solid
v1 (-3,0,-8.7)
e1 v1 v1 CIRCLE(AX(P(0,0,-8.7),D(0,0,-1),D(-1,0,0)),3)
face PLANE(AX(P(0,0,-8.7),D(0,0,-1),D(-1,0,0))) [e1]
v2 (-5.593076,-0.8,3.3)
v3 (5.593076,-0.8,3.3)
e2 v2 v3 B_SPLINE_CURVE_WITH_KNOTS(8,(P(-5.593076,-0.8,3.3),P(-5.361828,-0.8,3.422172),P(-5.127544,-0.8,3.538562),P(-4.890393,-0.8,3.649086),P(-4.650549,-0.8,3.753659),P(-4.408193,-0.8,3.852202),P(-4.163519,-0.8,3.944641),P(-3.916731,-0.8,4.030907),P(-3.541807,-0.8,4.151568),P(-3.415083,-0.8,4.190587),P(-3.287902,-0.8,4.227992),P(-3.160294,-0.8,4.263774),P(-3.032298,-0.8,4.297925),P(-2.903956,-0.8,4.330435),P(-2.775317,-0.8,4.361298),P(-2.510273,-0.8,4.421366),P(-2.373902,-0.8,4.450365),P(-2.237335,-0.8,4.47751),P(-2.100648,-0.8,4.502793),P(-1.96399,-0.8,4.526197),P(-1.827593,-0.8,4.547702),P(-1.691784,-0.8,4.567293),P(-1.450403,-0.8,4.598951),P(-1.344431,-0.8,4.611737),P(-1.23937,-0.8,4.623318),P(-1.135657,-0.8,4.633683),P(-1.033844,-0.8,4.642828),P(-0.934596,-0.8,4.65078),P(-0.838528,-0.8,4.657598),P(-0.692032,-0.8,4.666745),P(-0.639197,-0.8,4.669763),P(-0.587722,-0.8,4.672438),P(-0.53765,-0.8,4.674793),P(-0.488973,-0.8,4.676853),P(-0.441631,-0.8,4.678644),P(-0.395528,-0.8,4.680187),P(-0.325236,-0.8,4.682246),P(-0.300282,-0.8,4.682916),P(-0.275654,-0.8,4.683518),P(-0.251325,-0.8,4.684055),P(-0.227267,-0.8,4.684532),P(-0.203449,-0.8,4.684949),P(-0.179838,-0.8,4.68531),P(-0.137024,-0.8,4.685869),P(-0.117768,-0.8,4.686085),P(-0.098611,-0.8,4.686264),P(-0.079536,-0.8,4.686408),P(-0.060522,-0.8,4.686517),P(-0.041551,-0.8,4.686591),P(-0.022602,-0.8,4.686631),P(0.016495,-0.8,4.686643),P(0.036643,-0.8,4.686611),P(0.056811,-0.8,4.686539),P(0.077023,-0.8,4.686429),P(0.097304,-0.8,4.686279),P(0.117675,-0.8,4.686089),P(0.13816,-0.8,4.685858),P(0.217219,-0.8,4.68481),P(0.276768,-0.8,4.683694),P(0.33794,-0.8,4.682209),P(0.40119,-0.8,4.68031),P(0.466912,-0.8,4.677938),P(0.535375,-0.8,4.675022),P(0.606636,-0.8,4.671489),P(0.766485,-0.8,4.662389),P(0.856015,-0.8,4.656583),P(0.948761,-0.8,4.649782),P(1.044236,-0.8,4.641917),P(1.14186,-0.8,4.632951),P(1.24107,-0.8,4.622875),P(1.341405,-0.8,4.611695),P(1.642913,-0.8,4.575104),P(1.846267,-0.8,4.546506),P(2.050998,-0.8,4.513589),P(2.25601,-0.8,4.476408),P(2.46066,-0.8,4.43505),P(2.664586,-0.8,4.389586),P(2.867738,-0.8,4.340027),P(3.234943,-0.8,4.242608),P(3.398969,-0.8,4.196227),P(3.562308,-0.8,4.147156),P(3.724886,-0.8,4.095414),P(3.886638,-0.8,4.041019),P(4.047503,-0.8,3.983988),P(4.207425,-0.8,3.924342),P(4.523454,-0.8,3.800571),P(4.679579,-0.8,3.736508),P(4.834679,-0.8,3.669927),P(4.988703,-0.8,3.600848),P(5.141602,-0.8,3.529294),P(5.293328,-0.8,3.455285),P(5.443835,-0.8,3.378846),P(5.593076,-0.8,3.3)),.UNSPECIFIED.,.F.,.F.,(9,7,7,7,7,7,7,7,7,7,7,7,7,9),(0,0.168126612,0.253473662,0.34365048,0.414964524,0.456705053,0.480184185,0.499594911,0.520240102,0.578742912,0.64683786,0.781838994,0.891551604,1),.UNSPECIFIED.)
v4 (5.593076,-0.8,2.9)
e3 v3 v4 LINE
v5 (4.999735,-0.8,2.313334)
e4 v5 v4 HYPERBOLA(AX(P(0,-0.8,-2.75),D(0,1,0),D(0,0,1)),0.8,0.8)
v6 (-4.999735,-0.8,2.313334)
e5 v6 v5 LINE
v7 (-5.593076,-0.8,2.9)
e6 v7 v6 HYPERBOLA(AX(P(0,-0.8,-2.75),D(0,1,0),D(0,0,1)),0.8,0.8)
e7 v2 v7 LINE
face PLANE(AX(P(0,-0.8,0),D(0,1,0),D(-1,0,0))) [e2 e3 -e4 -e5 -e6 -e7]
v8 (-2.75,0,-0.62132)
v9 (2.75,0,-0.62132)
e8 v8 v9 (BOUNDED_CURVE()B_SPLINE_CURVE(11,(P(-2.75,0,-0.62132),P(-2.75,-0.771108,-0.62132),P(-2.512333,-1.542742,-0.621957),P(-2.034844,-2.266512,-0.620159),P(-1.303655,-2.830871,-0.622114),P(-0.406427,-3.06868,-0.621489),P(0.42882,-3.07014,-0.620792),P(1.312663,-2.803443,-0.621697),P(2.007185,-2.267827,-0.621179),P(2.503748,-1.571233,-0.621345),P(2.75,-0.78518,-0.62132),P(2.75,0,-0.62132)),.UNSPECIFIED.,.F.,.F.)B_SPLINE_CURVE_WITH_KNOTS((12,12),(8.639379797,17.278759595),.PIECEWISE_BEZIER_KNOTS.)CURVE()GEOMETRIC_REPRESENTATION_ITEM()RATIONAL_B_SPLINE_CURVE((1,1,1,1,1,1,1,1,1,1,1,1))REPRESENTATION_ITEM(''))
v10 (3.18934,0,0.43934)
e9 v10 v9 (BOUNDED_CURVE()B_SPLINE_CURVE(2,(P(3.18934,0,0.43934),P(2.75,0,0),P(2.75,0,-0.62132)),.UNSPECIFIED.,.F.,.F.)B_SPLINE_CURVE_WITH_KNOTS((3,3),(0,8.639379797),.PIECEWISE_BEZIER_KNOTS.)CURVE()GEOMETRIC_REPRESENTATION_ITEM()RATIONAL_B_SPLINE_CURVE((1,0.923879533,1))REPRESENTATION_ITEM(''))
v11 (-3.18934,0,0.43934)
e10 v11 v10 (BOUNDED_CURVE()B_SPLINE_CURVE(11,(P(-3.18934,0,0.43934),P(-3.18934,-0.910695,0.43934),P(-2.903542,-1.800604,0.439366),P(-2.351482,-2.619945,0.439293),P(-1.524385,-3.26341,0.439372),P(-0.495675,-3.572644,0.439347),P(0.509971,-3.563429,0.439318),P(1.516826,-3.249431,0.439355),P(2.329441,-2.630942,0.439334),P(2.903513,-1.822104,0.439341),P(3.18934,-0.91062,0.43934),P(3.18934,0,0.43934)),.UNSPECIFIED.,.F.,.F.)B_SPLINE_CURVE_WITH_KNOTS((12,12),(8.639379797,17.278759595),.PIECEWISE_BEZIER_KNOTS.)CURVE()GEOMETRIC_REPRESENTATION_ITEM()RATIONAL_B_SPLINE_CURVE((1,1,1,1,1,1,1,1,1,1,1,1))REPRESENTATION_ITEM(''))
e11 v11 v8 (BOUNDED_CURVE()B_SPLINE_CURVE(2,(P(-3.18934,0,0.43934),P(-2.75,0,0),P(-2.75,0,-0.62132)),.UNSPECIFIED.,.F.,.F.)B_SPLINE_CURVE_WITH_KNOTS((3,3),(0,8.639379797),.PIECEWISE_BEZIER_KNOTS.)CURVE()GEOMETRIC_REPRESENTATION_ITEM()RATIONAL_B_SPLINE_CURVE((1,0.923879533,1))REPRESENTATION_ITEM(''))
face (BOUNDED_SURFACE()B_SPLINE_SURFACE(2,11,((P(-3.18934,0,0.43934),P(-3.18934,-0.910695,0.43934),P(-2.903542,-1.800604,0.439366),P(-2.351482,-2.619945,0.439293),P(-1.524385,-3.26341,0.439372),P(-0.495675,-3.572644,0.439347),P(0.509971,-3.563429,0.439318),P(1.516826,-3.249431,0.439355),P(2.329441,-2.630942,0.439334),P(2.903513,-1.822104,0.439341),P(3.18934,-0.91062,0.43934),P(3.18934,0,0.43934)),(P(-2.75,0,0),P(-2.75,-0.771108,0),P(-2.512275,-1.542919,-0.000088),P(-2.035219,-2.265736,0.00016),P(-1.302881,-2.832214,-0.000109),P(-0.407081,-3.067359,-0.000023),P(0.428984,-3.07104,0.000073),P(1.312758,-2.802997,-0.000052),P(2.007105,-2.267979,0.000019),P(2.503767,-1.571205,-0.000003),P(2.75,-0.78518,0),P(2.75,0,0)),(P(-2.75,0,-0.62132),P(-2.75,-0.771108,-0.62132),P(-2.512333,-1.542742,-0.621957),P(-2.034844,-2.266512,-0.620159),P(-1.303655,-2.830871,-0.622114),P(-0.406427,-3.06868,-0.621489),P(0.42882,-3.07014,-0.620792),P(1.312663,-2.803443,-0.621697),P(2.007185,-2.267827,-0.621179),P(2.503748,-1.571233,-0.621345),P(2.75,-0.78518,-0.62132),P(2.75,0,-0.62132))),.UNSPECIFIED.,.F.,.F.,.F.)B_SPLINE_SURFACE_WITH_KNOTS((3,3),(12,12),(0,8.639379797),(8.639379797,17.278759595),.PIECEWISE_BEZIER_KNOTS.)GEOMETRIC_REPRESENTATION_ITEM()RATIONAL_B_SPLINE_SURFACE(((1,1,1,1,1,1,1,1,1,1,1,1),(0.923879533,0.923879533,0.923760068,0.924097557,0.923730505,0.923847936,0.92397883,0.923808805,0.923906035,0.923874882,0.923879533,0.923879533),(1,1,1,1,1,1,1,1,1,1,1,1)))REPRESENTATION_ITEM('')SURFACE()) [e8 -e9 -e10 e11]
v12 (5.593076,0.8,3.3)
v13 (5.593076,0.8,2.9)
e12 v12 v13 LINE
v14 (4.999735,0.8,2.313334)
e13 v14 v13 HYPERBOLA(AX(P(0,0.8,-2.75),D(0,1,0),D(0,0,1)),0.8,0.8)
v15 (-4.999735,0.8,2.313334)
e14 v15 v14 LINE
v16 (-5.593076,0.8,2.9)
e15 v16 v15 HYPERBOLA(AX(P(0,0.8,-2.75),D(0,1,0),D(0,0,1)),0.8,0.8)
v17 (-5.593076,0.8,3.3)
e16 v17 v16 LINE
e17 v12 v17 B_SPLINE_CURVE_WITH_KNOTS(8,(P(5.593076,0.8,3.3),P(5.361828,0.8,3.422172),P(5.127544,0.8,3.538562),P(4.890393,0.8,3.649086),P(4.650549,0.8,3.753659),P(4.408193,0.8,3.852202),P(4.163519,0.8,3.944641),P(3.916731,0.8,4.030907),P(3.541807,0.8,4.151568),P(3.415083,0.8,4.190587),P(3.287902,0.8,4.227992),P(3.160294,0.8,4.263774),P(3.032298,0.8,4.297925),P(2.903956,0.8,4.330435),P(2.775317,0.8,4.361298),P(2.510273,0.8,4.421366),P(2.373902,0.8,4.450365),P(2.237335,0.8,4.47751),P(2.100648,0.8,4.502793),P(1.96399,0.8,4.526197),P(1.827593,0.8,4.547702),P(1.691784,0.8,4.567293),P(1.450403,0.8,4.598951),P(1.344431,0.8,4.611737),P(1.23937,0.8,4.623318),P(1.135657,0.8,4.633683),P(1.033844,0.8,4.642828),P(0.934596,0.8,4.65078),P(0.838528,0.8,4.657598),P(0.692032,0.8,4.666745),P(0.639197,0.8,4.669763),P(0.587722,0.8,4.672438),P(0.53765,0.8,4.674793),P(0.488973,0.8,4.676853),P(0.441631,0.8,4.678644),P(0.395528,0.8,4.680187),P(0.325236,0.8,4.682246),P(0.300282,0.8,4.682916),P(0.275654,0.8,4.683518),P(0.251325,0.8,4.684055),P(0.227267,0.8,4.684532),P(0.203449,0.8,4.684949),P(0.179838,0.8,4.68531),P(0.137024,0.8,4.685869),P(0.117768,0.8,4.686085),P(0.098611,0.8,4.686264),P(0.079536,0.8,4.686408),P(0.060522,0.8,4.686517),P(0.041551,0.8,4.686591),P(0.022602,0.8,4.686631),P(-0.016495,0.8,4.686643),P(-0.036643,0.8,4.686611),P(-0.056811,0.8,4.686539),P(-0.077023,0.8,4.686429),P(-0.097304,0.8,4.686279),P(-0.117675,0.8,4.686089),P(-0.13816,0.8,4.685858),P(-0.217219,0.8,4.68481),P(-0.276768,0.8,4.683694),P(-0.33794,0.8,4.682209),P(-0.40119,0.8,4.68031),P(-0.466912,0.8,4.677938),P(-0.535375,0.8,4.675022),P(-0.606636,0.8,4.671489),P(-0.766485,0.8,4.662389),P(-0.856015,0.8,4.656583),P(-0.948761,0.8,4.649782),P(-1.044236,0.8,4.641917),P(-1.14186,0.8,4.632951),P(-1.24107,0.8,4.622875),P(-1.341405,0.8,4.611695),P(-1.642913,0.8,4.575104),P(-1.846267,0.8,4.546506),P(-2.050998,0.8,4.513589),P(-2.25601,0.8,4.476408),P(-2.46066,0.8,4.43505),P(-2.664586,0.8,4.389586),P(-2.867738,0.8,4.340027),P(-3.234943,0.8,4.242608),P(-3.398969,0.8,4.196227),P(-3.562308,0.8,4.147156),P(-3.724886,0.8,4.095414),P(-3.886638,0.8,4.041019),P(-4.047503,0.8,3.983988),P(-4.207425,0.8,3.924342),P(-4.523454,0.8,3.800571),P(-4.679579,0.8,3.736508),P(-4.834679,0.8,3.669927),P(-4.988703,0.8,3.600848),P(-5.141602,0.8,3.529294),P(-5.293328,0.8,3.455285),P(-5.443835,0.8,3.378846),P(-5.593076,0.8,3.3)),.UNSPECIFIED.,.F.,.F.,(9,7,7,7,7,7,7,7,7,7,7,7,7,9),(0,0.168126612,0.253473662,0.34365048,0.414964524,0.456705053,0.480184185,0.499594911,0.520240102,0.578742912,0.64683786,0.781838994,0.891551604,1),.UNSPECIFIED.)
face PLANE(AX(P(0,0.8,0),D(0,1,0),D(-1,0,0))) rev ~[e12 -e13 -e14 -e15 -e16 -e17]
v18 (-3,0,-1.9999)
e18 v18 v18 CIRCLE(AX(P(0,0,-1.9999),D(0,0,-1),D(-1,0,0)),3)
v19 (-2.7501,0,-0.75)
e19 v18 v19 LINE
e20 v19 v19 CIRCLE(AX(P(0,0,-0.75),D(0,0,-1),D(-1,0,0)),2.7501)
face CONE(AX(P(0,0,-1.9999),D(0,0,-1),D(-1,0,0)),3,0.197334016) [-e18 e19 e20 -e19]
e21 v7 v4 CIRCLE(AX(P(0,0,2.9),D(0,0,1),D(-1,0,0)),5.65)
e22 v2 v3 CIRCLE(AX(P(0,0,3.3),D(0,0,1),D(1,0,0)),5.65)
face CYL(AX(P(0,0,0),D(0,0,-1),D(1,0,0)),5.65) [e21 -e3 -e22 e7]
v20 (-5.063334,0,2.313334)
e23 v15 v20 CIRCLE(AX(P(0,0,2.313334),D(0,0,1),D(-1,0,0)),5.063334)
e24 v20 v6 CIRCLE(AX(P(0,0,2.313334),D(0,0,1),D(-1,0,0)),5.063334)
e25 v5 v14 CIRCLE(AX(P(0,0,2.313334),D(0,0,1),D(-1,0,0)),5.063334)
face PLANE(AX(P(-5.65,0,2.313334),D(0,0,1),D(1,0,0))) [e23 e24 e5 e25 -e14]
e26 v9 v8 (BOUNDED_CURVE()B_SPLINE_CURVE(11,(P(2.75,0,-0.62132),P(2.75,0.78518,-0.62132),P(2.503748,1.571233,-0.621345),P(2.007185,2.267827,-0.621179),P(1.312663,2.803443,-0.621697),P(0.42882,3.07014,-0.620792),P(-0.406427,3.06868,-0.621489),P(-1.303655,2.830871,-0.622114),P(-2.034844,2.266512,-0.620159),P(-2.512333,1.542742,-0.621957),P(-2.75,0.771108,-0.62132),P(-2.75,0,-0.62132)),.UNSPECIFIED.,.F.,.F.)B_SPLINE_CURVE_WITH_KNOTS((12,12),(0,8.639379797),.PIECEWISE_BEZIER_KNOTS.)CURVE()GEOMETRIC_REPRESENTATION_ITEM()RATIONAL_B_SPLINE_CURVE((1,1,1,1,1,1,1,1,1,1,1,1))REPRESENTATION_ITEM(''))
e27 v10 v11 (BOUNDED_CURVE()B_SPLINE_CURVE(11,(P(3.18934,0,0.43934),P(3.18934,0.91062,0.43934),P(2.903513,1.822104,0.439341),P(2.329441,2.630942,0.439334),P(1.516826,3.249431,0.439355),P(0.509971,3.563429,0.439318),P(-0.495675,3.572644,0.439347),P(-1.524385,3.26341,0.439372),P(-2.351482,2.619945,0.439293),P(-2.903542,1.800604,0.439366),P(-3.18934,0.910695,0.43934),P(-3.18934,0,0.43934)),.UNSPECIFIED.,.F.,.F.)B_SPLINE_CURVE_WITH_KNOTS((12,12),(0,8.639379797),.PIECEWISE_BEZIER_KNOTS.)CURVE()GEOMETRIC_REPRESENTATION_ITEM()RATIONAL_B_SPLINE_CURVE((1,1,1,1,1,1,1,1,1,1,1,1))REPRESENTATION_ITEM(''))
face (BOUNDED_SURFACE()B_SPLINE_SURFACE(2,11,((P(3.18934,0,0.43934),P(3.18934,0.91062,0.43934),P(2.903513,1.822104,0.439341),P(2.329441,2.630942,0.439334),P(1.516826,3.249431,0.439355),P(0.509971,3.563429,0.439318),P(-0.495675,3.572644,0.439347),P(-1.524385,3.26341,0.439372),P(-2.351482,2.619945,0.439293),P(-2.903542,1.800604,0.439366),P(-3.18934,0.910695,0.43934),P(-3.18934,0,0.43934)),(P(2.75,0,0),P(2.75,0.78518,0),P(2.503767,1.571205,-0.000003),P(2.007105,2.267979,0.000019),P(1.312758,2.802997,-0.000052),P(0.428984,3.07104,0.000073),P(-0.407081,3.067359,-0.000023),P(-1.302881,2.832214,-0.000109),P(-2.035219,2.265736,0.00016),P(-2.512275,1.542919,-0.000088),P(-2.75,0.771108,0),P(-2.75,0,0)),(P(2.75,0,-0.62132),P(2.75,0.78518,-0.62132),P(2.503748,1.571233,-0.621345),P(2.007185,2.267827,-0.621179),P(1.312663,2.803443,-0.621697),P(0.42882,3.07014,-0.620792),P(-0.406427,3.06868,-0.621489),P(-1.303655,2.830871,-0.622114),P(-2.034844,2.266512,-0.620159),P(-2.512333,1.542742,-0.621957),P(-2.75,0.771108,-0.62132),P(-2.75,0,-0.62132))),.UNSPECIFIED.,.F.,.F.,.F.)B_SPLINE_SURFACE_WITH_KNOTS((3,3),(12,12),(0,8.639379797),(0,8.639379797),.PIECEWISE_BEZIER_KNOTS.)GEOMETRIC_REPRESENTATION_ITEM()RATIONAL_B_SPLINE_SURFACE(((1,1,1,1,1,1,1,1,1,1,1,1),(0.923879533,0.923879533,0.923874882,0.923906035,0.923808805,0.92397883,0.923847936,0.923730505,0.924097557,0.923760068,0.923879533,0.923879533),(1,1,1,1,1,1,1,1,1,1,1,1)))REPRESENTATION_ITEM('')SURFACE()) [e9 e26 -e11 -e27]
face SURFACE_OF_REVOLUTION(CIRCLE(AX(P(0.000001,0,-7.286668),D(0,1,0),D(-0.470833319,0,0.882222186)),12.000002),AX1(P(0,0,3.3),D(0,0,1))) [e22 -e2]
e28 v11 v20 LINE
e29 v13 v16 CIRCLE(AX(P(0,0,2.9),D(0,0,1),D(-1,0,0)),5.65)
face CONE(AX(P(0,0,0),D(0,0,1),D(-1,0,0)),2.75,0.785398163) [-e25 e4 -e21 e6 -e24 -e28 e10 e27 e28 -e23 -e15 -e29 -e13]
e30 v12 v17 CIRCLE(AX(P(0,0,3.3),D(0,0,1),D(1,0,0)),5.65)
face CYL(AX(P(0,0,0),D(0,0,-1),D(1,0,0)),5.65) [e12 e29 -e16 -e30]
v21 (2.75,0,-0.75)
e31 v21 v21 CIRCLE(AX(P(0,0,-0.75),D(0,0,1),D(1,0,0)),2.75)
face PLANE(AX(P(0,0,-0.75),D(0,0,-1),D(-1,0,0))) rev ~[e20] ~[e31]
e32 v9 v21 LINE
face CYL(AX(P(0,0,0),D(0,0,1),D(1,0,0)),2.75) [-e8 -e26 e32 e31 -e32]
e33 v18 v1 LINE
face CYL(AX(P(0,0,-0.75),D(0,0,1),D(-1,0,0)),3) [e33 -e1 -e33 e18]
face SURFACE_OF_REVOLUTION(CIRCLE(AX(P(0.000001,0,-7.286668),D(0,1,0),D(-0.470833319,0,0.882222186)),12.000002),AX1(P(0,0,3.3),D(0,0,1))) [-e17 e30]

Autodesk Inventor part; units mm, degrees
ref_plane "WorkPlane11" through (0, 0, 0) normal (0, 0, 1) x (1, 0, 0)
ref_plane "Work Plane2" through (0, 0, -5.7) normal (0, 0, 1) x (1, 0, 0)
ref_plane "WorkPlane9" through (0, 0, 8.3) normal (0, 0, 1) x (1, 0, 0)
sketch "Sketch1" plane through (0, 0, 0) normal (0, 0, 1) x (1, 0, 0)
  point P0 (0, 0)
sketch "Sketch2" plane through (0, 0, 0) normal (0, 0, 1) x (1, 0, 0)
  circle A0 centre (0, 0) radius 2.75
  dimension "d2" = 5.5
extrude "Extrusion1" add sketch "Sketch2" against normal blind 0.75
sketch "Sketch3" plane through (0, 0, -0.75) normal (0, 0, -1) x (-1, 0, 0)
  circle A0 centre (0, 0) radius 3
  circle A1 centre (0, 0) radius 2.75 construction
  dimension "d8" = 6
extrude "Extrusion2" add sketch "Sketch3" along normal blind 7.95
sketch "Sketch4" plane through (0, 0, 0) normal (0, 0, 1) x (1, 0, 0)
  circle A0 centre (0, 0) radius 5.65
  circle A1 centre (0, 0) radius 2.75 construction
  dimension "d12" = 11.3
extrude "Extrusion3" add sketch "Sketch4" along normal blind 3.3
sketch "Sketch5" plane through (0, 0, 0) normal (0, 1, 0) x (-1, 0, 0)
  line L0 (5.65, 0) -> (2.75, 0)
  line L1 (5.65, 2.9) -> (5.65, 0)
  line L2 (2.75, 0) -> (5.65, 2.9)
  line L3 (-5.65, 0) -> (5.65, 0) construction
  line L4 (0, -7.649262) -> (0, 5.899262)
  line L5 (0, -10.358967) -> (0, 8.608967)
  line L6 (5.65, 0) -> (5.65, 3.3)
  line L7 (-4.75, 0) -> (4.75, 0)
  line L8 (2.75, 0) -> (2.75, -0.75)
  dimension "d17" = 45
revolve "Revolution1" cut sketch "Sketch5" angle 360 about axis through (0, 0, -7.649262) along (0, 0, 1)
sketch "Sketch6" plane through (0, 0, 0) normal (0, 1, 0) x (-1, 0, 0)
  line L0 (0, 3.3) -> (0, 4.713334)
  line L1 (0, 3.3) -> (5.65, 3.3)
  arc A0 (5.65, 3.3) -> (0, 4.713334) centre (0, -7.286666) ccw
  line L2 (-5.65, 3.3) -> (5.65, 3.3) construction
  line L3 (0, -7.649262) -> (0, 5.899262)
  line L4 (0, -10.358967) -> (0, 8.608967)
  line L5 (5.65, 2.9) -> (5.65, 3.3)
  arc A1 (0, 4.713334) -> (-5.65, 3.3) centre (0, -7.286666) ccw
  dimension "d20" = 12
  dimension "d24" = 5.65
revolve "Revolution2" add sketch "Sketch6" angle 360 about axis through (0, 0, -7.649262) along (0, 0, 1)
fillet "Fillet1" radius 1.5 2 edges at (0, 2.75, 0) (0, -2.75, 0)
chamfer "Chamfer1" distance 1.25 distance2 0.25 1 edges at (3, 0, -0.75) measured on face at (-2.9612, -0.4812, -6.05)
sketch "Sketch8" plane through (0, 0, 0) normal (0, 1, 0) x (-1, 0, 0)
  line L0 (-5.65, 4.713334) -> (5.65, 4.713334)
  line L1 (5.65, 4.713334) -> (5.65, 2.313334)
  line L2 (5.65, 2.313334) -> (-5.65, 2.313334)
  line L3 (-5.65, 2.313334) -> (-5.65, 4.713334)
  arc A0 (5.65, 3.3) -> (-5.65, 3.3) centre (0, -7.286666) ccw
  line L4 (-5.65, 2.9) -> (-5.65, 3.3)
  line L5 (5.65, 2.9) -> (5.65, 3.3)
  dimension "msp_d31" = 2.4
extrude "Extrusion4" cut sketch "Sketch8" against normal mid plane 1.6
thread "Thread1" size "M6x1" class "6g" standard "ISO Metric profile" full length
ref_plane "MSC_PF1" through (0, 0, 0) normal (1, 0, 0) x (0, 1, 0)
ref_plane "MSC_PT1" through (-5.65, 0, 2.9) normal (0, 0, -1) x (-1, 0, 0)
equation "\"d28\" = r"
equation "\"d29\" = msp_x"
equation "\"d30\" = 0.25 * PTC"
equation "\"d3\" = -msp_x + ParA"
equation "\"d8\" = NND"
equation "\"d9\" = msp_x - ParK + NLG - ParA"
equation "\"d12\" = Dk"
equation "\"d13\" = ParK"
equation "\"msp_d31\" = ParT"
equation "\"msp_d32\" = ParN"
equation "\"d2\" = 0.5 * PTC + msp_mdtds"
equation "\"d20\" = rf"
equation "\"d24\" = 0.5 * Dk"
equation "\"PTC\" = 1"
equation "\"NND\" = 6"
equation "\"msp_x\" = 1.25 * PTC"
equation "\"NLG\" = 12"
equation "\"msp_mdtds\" = NND - PTC"
equation "\"ParK\" = 3.3"
equation "\"ParN\" = 1.6"
equation "\"ParT\" = 2.4"
equation "\"r\" = 1.5"
equation "\"prf_c\" = 0"
equation "\"ParA\" = 2"
equation "\"Dk\" = 11.3"
equation "\"rf\" = 12"
equation "\"ParF\" = 1.4"
equation "\"THREADDIA\" = NND"
equation "\"PG\" = 1.2345"
equation "\"TEMPLATE\" = 1.2345"
properties part number "ISO 2010 - M6x12" material "Stainless Steel, 440C"
